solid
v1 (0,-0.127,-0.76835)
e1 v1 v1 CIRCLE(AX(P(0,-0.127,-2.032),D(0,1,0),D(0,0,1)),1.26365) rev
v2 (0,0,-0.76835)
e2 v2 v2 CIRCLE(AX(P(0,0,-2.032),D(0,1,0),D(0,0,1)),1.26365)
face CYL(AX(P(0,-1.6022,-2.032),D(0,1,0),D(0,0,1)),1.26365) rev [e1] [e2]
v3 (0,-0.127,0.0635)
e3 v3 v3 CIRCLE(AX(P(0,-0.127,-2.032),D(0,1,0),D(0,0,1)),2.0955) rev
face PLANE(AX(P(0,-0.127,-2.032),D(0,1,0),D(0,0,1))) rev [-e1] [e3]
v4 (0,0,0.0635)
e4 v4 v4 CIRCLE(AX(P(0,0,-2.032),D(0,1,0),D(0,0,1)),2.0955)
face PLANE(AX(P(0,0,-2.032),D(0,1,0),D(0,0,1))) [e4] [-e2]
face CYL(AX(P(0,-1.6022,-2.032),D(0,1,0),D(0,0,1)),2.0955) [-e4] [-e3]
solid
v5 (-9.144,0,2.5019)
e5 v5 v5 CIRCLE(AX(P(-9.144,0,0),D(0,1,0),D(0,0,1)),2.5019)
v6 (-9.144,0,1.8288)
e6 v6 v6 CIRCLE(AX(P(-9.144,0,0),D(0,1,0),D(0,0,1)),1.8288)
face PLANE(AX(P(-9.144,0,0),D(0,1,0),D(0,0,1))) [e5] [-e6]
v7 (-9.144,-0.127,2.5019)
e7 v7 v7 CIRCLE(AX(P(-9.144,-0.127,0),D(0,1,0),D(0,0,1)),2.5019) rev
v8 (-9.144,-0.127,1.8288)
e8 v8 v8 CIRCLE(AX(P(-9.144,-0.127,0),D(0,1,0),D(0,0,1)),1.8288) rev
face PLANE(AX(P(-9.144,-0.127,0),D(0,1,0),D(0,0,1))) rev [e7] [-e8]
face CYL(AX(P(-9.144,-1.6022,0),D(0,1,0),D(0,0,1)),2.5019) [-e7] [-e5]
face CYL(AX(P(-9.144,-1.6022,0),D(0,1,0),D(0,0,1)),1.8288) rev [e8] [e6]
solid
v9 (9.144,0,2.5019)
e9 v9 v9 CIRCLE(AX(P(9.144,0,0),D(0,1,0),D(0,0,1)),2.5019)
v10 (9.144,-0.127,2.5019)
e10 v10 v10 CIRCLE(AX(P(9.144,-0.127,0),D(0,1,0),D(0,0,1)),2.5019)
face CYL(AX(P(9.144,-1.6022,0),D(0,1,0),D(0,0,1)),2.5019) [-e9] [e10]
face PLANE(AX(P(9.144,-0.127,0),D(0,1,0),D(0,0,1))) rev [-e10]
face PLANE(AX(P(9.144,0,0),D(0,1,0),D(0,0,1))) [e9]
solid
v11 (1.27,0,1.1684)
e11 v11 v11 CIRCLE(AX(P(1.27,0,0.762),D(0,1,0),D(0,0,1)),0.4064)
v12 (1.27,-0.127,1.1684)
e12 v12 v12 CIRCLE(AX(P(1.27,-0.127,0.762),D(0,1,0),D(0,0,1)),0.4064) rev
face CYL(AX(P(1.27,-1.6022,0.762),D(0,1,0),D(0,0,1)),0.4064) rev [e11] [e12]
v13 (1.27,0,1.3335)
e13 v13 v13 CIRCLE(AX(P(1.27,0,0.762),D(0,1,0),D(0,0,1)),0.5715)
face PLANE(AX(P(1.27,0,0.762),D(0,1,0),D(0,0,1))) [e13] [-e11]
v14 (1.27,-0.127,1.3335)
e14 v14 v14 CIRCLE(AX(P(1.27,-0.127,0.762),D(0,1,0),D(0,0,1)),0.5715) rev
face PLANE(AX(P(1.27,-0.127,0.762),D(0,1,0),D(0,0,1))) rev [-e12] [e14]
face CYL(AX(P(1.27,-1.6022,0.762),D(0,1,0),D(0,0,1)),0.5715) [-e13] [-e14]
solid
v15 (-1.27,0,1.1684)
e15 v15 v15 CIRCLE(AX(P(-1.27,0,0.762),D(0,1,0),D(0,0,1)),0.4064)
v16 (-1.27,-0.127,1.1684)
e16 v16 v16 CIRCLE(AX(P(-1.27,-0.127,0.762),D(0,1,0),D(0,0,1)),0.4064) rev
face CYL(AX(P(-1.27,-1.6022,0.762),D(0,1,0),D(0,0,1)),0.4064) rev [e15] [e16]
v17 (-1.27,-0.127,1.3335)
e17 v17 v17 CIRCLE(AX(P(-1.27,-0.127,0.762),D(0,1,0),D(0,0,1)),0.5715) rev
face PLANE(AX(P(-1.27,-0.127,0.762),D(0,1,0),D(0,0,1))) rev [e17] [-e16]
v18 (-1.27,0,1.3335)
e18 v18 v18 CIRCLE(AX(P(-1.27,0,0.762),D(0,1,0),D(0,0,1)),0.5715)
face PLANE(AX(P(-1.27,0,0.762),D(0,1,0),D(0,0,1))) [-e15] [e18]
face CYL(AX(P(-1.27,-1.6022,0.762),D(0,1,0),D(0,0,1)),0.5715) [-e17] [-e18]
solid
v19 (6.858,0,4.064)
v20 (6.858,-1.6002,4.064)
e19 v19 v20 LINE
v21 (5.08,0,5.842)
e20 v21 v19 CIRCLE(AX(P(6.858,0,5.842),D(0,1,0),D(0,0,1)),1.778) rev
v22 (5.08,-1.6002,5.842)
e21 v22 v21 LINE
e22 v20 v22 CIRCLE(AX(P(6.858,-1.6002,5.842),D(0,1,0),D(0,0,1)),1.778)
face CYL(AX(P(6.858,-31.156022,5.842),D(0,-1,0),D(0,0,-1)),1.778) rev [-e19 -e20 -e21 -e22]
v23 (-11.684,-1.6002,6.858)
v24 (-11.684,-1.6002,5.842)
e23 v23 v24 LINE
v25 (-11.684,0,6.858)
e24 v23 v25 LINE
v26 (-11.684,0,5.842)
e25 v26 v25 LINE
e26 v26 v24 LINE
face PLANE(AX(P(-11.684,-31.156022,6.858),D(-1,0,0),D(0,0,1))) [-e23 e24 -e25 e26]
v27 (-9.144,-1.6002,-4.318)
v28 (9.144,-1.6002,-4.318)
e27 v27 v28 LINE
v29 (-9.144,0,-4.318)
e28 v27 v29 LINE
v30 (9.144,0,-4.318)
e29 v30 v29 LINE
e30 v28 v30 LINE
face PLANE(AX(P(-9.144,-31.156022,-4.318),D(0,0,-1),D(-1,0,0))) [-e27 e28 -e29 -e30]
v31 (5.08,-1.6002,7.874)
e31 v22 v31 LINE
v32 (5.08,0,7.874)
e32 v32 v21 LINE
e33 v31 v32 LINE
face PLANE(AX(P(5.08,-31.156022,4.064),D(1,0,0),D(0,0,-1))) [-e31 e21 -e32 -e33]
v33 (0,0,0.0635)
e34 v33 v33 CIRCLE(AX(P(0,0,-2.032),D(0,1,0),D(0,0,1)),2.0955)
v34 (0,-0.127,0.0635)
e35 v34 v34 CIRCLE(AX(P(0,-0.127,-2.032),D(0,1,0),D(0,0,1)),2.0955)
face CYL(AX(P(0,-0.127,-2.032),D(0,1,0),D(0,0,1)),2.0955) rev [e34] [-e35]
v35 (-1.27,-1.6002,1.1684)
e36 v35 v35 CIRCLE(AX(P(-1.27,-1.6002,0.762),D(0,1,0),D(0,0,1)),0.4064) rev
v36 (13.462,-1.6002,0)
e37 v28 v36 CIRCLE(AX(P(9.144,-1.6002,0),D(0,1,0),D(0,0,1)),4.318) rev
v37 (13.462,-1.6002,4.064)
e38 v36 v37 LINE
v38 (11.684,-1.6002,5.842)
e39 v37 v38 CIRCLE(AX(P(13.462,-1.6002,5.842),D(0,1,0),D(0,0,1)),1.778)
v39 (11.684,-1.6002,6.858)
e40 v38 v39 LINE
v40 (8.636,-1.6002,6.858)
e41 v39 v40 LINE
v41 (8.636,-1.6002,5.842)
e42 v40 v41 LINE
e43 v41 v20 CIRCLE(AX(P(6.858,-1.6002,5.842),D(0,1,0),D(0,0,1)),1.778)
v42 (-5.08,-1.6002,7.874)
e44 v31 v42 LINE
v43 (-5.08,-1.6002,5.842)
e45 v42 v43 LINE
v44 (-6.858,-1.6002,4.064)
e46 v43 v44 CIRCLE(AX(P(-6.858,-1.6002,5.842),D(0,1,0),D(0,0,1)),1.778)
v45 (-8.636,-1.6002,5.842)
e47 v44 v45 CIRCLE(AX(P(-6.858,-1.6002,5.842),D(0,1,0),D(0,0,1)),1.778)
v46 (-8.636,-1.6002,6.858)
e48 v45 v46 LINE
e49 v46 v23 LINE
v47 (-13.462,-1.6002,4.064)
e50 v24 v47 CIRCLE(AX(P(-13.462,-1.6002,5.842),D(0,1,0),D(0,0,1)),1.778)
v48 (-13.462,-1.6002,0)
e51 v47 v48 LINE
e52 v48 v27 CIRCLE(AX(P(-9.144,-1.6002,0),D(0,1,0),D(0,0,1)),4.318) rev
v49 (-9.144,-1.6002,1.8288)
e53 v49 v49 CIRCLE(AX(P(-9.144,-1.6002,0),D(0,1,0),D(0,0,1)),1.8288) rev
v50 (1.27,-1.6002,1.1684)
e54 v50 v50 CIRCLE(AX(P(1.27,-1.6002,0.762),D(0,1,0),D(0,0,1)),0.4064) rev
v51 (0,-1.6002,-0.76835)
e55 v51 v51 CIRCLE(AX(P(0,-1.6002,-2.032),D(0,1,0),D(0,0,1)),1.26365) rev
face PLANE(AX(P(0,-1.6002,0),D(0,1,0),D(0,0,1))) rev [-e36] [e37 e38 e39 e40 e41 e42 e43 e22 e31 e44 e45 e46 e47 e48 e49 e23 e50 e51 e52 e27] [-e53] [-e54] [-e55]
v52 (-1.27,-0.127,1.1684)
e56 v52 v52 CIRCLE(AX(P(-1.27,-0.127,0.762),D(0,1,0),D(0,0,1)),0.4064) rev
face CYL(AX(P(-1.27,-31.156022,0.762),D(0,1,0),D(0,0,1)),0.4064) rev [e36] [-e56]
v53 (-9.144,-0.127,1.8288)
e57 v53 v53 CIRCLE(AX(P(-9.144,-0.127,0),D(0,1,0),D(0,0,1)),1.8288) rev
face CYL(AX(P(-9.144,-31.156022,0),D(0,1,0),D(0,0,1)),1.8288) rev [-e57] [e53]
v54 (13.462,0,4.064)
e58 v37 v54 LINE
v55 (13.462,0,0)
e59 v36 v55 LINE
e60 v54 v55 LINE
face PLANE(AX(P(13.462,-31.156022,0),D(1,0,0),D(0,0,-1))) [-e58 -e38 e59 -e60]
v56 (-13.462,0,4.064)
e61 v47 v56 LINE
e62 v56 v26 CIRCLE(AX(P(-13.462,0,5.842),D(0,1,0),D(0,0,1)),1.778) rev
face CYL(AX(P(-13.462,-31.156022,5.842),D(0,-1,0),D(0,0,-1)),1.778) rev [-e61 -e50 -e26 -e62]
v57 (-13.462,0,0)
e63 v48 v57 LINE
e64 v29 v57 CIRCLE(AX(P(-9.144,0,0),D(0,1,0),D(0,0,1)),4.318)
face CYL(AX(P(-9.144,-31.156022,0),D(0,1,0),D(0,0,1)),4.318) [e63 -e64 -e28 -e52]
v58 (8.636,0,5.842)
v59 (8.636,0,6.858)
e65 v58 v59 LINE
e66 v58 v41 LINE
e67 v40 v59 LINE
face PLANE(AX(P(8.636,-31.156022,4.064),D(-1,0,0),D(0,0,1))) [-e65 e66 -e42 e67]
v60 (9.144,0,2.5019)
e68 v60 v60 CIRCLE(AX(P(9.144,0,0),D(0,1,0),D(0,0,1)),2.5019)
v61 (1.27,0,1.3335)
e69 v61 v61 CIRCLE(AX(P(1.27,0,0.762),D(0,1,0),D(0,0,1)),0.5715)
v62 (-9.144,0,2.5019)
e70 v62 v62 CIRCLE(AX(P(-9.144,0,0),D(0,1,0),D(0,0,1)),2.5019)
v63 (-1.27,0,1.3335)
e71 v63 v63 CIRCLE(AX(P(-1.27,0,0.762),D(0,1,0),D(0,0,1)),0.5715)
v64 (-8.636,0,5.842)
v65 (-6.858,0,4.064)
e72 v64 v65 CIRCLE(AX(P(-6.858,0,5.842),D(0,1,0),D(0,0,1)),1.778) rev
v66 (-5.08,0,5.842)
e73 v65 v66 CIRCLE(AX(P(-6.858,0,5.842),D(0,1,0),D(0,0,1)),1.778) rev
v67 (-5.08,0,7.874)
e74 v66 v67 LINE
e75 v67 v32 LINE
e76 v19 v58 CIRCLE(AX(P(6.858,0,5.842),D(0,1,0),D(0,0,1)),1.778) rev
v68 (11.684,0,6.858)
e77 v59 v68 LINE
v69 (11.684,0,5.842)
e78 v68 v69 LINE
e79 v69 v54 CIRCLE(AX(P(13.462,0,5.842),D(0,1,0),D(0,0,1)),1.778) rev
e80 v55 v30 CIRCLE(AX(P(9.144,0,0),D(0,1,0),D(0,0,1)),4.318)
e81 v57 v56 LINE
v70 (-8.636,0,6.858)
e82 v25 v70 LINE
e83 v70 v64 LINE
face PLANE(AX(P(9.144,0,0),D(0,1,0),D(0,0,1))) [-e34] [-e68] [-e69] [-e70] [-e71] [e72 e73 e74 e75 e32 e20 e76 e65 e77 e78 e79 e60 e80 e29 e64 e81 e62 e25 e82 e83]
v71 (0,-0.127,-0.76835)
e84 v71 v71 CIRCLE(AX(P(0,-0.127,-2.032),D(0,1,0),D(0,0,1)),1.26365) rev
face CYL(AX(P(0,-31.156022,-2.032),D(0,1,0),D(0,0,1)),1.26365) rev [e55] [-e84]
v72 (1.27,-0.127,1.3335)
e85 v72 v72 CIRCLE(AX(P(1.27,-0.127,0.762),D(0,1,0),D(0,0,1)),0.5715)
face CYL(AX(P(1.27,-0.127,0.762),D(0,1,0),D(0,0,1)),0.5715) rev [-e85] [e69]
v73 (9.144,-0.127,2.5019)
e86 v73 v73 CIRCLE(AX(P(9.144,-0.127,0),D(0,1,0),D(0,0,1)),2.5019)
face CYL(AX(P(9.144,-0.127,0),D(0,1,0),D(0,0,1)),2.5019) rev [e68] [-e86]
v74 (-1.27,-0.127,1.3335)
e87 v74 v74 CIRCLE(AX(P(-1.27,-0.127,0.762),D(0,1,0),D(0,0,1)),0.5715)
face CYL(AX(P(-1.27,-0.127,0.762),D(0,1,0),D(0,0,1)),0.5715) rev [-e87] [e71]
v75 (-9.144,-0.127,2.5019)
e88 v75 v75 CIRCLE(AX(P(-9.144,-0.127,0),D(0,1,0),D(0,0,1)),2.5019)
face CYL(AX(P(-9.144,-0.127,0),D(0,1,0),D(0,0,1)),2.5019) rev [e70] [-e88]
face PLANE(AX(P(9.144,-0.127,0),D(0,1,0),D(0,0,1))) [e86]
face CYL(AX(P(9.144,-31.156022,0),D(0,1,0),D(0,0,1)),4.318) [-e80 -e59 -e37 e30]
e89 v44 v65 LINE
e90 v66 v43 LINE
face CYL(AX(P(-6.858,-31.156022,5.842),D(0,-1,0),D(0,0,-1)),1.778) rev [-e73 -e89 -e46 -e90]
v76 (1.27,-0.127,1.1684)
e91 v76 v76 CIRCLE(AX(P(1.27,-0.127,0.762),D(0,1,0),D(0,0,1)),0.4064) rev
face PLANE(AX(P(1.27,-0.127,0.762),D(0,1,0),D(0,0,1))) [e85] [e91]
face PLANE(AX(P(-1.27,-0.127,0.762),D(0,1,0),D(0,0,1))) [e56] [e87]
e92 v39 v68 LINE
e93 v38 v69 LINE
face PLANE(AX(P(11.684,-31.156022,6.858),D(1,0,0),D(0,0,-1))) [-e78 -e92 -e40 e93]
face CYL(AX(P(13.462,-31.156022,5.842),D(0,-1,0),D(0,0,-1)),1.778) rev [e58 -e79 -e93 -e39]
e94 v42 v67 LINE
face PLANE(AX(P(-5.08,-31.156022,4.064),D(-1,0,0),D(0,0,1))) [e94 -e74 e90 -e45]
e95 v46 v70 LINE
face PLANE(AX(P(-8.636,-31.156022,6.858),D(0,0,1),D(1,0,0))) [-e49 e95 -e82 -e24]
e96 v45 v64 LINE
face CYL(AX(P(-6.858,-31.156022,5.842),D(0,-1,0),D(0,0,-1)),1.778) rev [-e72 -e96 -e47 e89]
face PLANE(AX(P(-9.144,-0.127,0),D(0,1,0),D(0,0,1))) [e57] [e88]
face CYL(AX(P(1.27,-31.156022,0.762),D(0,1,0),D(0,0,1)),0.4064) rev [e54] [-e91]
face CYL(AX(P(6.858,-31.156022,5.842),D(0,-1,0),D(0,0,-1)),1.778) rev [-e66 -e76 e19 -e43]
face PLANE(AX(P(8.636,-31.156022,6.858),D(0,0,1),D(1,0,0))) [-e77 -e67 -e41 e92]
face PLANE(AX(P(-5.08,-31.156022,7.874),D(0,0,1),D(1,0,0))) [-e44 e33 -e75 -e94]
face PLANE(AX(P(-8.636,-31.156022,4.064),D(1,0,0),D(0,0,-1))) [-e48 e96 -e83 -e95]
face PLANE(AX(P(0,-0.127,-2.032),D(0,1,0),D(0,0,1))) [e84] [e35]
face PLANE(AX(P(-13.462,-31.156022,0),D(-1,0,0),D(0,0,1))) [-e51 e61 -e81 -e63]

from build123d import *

# Parameters (mm, degrees)
SKETCH2_R           = 0.4064
SKETCH2_R_2         = 1.26365
SKETCH2_R_3         = 1.8288
BOSS_EXTRUDE1_DEPTH = 1.6002
SKETCH5_R           = 2.5019
SKETCH5_R_2         = 2.0955
SKETCH5_R_3         = 0.5715
CUT_EXTRUDE1_DEPTH  = 0.127
BOSS_EXTRUDE2_REACH = 17.678
SKETCH6_R           = 2.5019
SKETCH6_R_2         = 2.0955
SKETCH6_R_3         = 1.26365
SKETCH6_R_4         = 0.5715
SKETCH6_R_5         = 0.4064
SKETCH6_R_6         = 1.8288
FILLET1_R           = 1.778


with BuildPart() as part:
    # Sketch2 → Boss-Extrude1 (new body)
    with BuildSketch(Plane(origin=(0, 0, 0), x_dir=(1, 0, 0), z_dir=(0, 1, 0))):
        with BuildLine():
            Line((-9.144, 4.318), (9.144, 4.318))
            ThreePointArc((9.144, 4.318), (12.197287081, 3.053287081), (13.462, 0))
            Line((13.462, 0), (13.462, -4.064))
            Line((13.462, -4.064), (11.684, -4.064))
            Line((11.684, -4.064), (11.684, -6.858))
            Line((11.684, -6.858), (8.636, -6.858))
            Line((8.636, -6.858), (8.636, -4.064))
            Line((8.636, -4.064), (5.08, -4.064))
            Line((5.08, -4.064), (5.08, -7.874))
            Line((5.08, -7.874), (-5.08, -7.874))
            Line((-5.08, -7.874), (-5.08, -4.064))
            Line((-5.08, -4.064), (-8.636, -4.064))
            Line((-8.636, -4.064), (-8.636, -6.858))
            Line((-8.636, -6.858), (-11.684, -6.858))
            Line((-11.684, -6.858), (-11.684, -4.064))
            Line((-11.684, -4.064), (-13.462, -4.064))
            Line((-13.462, -4.064), (-13.462, 0))
            ThreePointArc((-13.462, 0), (-12.197287081, 3.053287081), (-9.144, 4.318))
        make_face()
        with Locations(Location((-1.27, -0.762, 0), (0, 0, 270))):
            Circle(SKETCH2_R, mode=Mode.SUBTRACT)
        with Locations(Location((0, 2.032, 0), (0, 0, 270))):
            Circle(SKETCH2_R_2, mode=Mode.SUBTRACT)
        with Locations(Location((1.27, -0.762, 0), (0, 0, 270))):
            Circle(SKETCH2_R, mode=Mode.SUBTRACT)
        with Locations(Location((-9.144, 0, 0), (0, 0, 270))):
            Circle(SKETCH2_R_3, mode=Mode.SUBTRACT)
    extrude(amount=-BOSS_EXTRUDE1_DEPTH)

    # Sketch5 → Cut-Extrude1 (cut)
    with BuildSketch(Plane(origin=(0, 0, 0), x_dir=(1, 0, 0), z_dir=(0, 1, 0))):
        with Locations(Location((-9.144, 0, 0), (0, 0, 270))):
            Circle(SKETCH5_R)
        with Locations(Location((9.144, 0, 0), (0, 0, 270))):
            Circle(SKETCH5_R)
        with Locations(Location((0, 2.032, 0), (0, 0, 270))):
            Circle(SKETCH5_R_2)
        with Locations(Location((-1.27, -0.762, 0), (0, 0, 270))):
            Circle(SKETCH5_R_3)
        with Locations(Location((1.27, -0.762, 0), (0, 0, 270))):
            Circle(SKETCH5_R_3)
    extrude(amount=-CUT_EXTRUDE1_DEPTH, mode=Mode.SUBTRACT)


with BuildPart() as body_2:

    # Sketch6 → Boss-Extrude2 (new, up to next)
    with BuildSketch(Plane(origin=(0, 0, 0), x_dir=(1, 0, 0), z_dir=(0, 1, 0)), mode=Mode.PRIVATE) as boss_extrude2_sk1:
        with Locations(Location((9.144, 0, 0), (0, 0, 270))):
            Circle(SKETCH6_R)
    boss_extrude2_tool1 = extrude(boss_extrude2_sk1.sketch, amount=-BOSS_EXTRUDE2_REACH, mode=Mode.PRIVATE) - part.part
    # Sketch6 → Boss-Extrude2 (new, up to next)
    with BuildSketch(Plane(origin=(0, 0, 0), x_dir=(1, 0, 0), z_dir=(0, 1, 0)), mode=Mode.PRIVATE) as boss_extrude2_sk2:
        with Locations(Location((0, 2.032, 0), (0, 0, 270))):
            Circle(SKETCH6_R_2)
        with Locations(Location((0, 2.032, 0), (0, 0, 270))):
            Circle(SKETCH6_R_3, mode=Mode.SUBTRACT)
    boss_extrude2_tool2 = extrude(boss_extrude2_sk2.sketch, amount=-BOSS_EXTRUDE2_REACH, mode=Mode.PRIVATE) - part.part
    # Sketch6 → Boss-Extrude2 (new, up to next)
    with BuildSketch(Plane(origin=(0, 0, 0), x_dir=(1, 0, 0), z_dir=(0, 1, 0)), mode=Mode.PRIVATE) as boss_extrude2_sk3:
        with Locations(Location((-1.27, -0.762, 0), (0, 0, 270))):
            Circle(SKETCH6_R_4)
        with Locations(Location((-1.27, -0.762, 0), (0, 0, 270))):
            Circle(SKETCH6_R_5, mode=Mode.SUBTRACT)
    boss_extrude2_tool3 = extrude(boss_extrude2_sk3.sketch, amount=-BOSS_EXTRUDE2_REACH, mode=Mode.PRIVATE) - part.part
    # Sketch6 → Boss-Extrude2 (new, up to next)
    with BuildSketch(Plane(origin=(0, 0, 0), x_dir=(1, 0, 0), z_dir=(0, 1, 0)), mode=Mode.PRIVATE) as boss_extrude2_sk4:
        with Locations(Location((1.27, -0.762, 0), (0, 0, 270))):
            Circle(SKETCH6_R_4)
        with Locations(Location((1.27, -0.762, 0), (0, 0, 270))):
            Circle(SKETCH6_R_5, mode=Mode.SUBTRACT)
    boss_extrude2_tool4 = extrude(boss_extrude2_sk4.sketch, amount=-BOSS_EXTRUDE2_REACH, mode=Mode.PRIVATE) - part.part
    # Sketch6 → Boss-Extrude2 (new, up to next)
    with BuildSketch(Plane(origin=(0, 0, 0), x_dir=(1, 0, 0), z_dir=(0, 1, 0)), mode=Mode.PRIVATE) as boss_extrude2_sk5:
        with Locations(Location((-9.144, 0, 0), (0, 0, 270))):
            Circle(SKETCH6_R)
        with Locations(Location((-9.144, 0, 0), (0, 0, 270))):
            Circle(SKETCH6_R_6, mode=Mode.SUBTRACT)
    boss_extrude2_tool5 = extrude(boss_extrude2_sk5.sketch, amount=-BOSS_EXTRUDE2_REACH, mode=Mode.PRIVATE) - part.part
    add(boss_extrude2_tool1.solids().sort_by_distance((9.144, 0, 0))[0])
    add(boss_extrude2_tool2.solids().sort_by_distance((0, 0, -4.06823))[0])
    add(boss_extrude2_tool3.solids().sort_by_distance((-1.27, 0, 0.206664))[0])
    add(boss_extrude2_tool4.solids().sort_by_distance((1.27, 0, 0.206664))[0])
    add(boss_extrude2_tool5.solids().sort_by_distance((-9.144, 0, -2.431136))[0])


with BuildPart() as part_1:
    add(part.part)

    # Fillet1
    fillet1_edges = [part_1.edges().sort_by_distance(p)[0] for p in [
        (5.08, -0.8001, 4.064),
        (8.636, -0.8001, 4.064),
        (-8.636, -0.8001, 4.064),
        (-11.684, -0.8001, 4.064),
        (-5.08, -0.8001, 4.064),
        (11.684, -0.8001, 4.064),
    ]]
    fillet(fillet1_edges, radius=FILLET1_R - 0.0001)  # a hair under: the kernel refuses the full size


solid = Compound([body_2.part, part_1.part])
